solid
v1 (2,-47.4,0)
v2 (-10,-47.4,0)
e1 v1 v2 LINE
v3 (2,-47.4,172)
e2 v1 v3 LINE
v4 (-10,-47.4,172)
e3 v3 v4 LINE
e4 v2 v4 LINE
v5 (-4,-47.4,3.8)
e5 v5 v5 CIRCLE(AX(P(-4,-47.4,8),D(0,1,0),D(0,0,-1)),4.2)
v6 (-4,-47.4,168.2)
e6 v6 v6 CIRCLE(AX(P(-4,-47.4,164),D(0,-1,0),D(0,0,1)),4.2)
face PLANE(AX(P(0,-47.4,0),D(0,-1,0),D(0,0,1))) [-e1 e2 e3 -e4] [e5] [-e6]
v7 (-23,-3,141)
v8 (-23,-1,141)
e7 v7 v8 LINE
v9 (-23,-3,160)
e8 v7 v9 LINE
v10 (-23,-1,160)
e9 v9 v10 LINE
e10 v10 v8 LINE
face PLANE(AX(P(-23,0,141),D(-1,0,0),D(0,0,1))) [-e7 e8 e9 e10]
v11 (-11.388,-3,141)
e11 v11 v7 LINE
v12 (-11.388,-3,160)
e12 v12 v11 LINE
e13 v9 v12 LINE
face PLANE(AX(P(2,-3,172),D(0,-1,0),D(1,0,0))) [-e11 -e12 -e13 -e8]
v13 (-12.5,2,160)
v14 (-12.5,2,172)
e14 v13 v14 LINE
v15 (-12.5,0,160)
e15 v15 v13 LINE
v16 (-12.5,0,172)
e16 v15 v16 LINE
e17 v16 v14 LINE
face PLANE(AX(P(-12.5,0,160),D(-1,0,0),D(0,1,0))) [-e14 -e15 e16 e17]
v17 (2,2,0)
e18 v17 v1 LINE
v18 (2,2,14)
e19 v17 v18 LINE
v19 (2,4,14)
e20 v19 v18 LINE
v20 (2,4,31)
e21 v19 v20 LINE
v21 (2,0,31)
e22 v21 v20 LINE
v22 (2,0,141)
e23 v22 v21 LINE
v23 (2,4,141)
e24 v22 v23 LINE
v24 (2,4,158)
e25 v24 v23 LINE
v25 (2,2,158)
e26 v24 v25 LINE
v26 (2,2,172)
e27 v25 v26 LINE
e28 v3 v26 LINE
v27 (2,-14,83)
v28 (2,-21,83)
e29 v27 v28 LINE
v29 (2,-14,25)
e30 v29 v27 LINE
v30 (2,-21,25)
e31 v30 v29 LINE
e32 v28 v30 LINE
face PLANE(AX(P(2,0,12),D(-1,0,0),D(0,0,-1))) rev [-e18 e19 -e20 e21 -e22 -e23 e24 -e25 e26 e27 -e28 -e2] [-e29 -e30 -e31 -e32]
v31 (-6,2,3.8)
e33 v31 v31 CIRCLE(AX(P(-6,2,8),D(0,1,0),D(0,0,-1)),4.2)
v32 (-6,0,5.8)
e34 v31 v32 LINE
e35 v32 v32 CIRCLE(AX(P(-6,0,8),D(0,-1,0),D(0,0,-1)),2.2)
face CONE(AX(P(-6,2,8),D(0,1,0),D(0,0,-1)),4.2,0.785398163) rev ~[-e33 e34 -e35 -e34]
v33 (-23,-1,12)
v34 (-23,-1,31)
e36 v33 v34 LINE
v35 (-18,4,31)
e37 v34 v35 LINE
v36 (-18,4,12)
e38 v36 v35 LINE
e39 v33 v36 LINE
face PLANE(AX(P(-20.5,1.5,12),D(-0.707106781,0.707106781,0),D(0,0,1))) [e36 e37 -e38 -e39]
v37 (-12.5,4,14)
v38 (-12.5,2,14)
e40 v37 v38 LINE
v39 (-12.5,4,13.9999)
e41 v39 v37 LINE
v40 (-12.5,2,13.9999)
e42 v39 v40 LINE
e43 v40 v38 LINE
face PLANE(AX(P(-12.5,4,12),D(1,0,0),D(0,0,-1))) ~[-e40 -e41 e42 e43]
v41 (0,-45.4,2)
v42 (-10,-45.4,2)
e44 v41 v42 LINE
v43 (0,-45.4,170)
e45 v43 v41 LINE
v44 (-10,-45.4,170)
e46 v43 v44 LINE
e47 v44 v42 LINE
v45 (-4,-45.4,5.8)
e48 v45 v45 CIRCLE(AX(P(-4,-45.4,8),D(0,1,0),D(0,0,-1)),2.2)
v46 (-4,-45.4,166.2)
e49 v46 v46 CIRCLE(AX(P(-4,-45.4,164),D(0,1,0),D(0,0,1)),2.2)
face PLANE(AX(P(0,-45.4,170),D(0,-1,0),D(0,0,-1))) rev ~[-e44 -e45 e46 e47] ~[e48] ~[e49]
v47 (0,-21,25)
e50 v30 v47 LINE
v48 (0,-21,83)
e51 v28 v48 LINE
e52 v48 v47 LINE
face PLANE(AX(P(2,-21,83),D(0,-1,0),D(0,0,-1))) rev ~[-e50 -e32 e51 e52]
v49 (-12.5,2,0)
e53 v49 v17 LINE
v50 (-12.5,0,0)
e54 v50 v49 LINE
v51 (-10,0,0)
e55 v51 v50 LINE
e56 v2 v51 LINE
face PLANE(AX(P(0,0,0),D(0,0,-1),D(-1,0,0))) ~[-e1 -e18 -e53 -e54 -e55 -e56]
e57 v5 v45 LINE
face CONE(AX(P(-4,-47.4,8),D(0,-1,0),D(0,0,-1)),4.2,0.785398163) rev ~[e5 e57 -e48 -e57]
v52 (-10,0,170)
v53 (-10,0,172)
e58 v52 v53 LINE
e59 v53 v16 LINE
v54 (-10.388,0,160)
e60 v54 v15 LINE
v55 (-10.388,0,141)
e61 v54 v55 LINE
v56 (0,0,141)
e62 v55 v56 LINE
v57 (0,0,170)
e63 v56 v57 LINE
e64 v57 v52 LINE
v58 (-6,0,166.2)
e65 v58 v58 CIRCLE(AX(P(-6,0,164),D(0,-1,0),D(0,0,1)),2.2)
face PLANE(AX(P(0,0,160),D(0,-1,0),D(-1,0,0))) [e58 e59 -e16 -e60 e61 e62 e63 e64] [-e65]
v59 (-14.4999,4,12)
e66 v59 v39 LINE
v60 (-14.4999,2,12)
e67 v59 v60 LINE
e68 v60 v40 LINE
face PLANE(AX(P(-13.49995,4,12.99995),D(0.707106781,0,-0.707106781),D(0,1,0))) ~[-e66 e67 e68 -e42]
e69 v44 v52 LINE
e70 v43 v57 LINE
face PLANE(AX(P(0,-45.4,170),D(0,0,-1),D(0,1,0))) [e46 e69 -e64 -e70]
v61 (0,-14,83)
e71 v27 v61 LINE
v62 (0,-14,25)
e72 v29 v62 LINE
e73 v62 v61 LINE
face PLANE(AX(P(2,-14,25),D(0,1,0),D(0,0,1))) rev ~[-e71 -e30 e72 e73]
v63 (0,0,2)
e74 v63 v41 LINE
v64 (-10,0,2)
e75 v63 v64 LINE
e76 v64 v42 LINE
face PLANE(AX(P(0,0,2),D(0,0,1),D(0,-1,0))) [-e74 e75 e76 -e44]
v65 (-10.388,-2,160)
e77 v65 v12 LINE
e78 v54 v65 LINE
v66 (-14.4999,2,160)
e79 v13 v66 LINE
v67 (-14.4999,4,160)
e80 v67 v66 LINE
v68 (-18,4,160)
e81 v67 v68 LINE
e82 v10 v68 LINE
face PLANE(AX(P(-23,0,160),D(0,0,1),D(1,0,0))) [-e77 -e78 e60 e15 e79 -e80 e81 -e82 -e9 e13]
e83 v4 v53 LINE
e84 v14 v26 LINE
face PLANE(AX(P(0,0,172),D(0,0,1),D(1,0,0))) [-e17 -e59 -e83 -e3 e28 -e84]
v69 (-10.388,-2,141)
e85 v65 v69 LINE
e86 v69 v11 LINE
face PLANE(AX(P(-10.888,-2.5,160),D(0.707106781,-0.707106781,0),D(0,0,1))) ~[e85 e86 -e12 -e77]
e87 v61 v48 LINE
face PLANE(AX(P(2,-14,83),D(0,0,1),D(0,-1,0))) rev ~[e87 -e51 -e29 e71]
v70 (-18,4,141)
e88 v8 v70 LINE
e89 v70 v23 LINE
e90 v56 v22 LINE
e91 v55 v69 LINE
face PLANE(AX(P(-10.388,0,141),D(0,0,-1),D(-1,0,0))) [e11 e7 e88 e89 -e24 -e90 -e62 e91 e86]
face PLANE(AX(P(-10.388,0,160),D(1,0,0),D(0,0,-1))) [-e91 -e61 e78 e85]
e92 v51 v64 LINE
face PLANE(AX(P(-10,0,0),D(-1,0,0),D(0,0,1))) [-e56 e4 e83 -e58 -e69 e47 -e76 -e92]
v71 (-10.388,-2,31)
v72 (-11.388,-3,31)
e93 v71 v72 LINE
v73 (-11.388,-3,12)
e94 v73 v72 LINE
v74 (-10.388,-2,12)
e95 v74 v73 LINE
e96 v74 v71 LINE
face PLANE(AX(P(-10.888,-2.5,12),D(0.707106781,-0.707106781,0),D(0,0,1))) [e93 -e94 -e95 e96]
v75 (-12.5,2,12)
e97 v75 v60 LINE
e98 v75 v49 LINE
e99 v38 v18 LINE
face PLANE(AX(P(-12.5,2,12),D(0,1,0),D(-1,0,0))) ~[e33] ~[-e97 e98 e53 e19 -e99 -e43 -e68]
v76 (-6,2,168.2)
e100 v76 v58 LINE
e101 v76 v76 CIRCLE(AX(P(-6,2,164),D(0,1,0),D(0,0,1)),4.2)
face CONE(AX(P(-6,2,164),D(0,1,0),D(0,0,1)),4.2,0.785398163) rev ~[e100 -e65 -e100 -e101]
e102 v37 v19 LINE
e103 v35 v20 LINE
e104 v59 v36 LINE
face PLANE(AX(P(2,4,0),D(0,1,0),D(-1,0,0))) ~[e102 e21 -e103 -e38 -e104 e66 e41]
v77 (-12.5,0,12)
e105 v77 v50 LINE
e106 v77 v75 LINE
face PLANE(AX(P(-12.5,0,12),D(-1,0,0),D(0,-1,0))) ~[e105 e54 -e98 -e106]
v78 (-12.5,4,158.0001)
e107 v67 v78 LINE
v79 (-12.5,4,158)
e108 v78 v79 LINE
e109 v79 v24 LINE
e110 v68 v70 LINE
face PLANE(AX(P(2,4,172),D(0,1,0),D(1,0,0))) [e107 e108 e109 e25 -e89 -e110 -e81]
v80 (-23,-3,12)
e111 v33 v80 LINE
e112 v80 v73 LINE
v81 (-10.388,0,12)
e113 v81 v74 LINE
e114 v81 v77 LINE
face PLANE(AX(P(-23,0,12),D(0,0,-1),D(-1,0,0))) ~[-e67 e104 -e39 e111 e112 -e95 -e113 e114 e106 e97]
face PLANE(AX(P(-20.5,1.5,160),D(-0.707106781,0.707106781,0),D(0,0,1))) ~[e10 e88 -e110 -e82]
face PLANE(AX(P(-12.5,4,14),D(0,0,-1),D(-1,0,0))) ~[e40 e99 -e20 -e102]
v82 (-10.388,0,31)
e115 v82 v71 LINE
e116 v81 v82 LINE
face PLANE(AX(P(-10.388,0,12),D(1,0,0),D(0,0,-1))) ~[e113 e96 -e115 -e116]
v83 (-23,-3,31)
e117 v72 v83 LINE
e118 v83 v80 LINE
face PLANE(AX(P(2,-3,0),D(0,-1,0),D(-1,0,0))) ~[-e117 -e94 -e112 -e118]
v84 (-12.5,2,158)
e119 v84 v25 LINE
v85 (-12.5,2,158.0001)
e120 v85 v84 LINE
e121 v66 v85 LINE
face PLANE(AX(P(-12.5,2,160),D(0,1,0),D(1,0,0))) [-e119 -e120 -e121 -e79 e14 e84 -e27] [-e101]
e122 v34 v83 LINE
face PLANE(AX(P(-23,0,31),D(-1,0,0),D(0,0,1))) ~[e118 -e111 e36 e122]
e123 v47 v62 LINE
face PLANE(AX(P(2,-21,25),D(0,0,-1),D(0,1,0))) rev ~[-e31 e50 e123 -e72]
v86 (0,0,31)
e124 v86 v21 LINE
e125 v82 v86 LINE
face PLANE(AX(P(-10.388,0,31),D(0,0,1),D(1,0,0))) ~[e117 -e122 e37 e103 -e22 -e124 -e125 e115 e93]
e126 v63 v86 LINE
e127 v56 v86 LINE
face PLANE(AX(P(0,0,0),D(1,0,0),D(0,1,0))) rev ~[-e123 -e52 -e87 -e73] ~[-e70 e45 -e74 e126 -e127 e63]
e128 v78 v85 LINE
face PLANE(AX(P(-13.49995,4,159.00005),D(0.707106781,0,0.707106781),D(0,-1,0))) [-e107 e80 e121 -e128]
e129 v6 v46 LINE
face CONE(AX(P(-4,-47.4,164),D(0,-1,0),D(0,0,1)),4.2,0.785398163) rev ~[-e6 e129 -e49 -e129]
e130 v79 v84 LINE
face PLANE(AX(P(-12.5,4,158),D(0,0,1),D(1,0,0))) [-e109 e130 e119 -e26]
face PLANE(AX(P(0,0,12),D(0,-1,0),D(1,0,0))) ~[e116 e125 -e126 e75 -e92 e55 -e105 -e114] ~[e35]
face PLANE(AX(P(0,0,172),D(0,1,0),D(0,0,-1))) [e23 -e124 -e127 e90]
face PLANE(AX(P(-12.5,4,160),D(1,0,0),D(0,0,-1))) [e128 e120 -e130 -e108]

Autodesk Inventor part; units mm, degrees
ref_plane "YZ Plane" through (0, 0, 0) normal (1, 0, 0) x (0, 1, 0)
ref_plane "XZ Plane" through (0, 0, 0) normal (0, 1, 0) x (-1, 0, 0)
ref_plane "XY Plane" through (0, 0, 0) normal (0, 0, 1) x (1, 0, 0)
sketch "Sketch1" plane through (0, 0, 0) normal (1, 0, 0) x (0, 1, 0)
  line L0 (0, 0) -> (-47.4, 0)
  line L1 (-47.4, 0) -> (-47.4, 172)
  line L2 (-47.4, 172) -> (0, 172)
  line L3 (0, 172) -> (0, 0)
  dimension "d0" = 172
  dimension "d1" = 47.4
extrude "Extrusion1" add sketch "Sketch1" along normal blind 2
sketch "Sketch2" plane through (0, 0, 0) normal (-1, 0, 0) x (0, 0, 1)
  line L0 (0, 0) -> (172, 0) projected
  line L1 (172, -47.4) -> (0, -47.4) projected
  line L2 (0, 0) -> (2, 0)
  line L3 (2, 0) -> (2, -47.4)
  line L4 (2, -47.4) -> (0, -47.4)
  line L5 (0, -47.4) -> (0, 0)
  line L6 (172, 0) -> (172, -47.4) projected
  line L7 (0, -47.4) -> (172, -47.4)
  line L8 (172, -47.4) -> (172, -45.4)
  line L9 (172, -45.4) -> (0, -45.4)
  line L10 (0, -45.4) -> (0, -47.4)
  line L11 (172, -47.4) -> (170, -47.4)
  line L12 (170, -47.4) -> (170, 0)
  line L13 (170, 0) -> (172, 0)
  line L14 (172, 0) -> (172, -47.4)
  point P0 (2, -45.4)
  point P1 (0, -47.4)
  point P2 (170, -45.4)
  dimension "d4" = 2
  dimension "d5" = 2
  dimension "d6" = 2
extrude "Extrusion2" add sketch "Sketch2" along normal blind 10 contours L0 L3 L9 L5 | L9 L3 L1 L5 | L0 L6 L9 L12 | L9 L12 L1 L3 | L9 L6 L1 L12
sketch "Sketch3" plane through (2, 0, 172) normal (0, 1, 0) x (1, 0, 0)
  line L0 (0, 0) -> (0, 172) projected
  line L1 (0, 12) -> (-25, 12)
  line L2 (-25, 12) -> (-25, 31)
  line L3 (-25, 31) -> (0, 31)
  line L4 (0, 31) -> (0, 12)
  line L5 (-12, 0) -> (0, 0) projected
  point P0 (-2, 172)
  point P1 (0, 31)
  dimension "d9" = 12
  dimension "d10" = 25
  dimension "d11" = 19
extrude "Extrusion3" add sketch "Sketch3" along normal blind 4
sketch "Sketch4" plane through (2, 0, 172) normal (0, -1, 0) x (1, 0, 0)
  line L0 (-2, -31) -> (-2, -12) projected
  line L1 (0, -12) -> (0, -31) projected
  line L2 (0, -31) -> (-25, -31) projected
  line L3 (-25, -31) -> (-25, -12) projected
  line L4 (-25, -12) -> (0, -12) projected
  line L5 (-25, -31) -> (-25, -12) projected
  line L6 (-2, -31) -> (-25, -31) projected
  line L7 (-25, -12) -> (-12.388, -12)
  line L8 (-12.388, -12) -> (-12.388, -31)
  line L9 (-12.388, -31) -> (-25, -31)
  line L10 (-25, -31) -> (-25, -12)
  point P0 (-2, -172)
  point P1 (-12.388, -12)
  dimension "d14" = 12.388
extrude "Extrusion4" add sketch "Sketch4" along normal blind 3 contours L2 L3 L4 L8
chamfer "Chamfer1" distance 1 angle 45 1 edges at (-10.388, -3, 150.5)
chamfer "Chamfer2" distance 5 angle 45 1 edges at (-23, 4, 150.5)
sketch "Sketch5" plane through (0, 0, 160) normal (0, 0, 1) x (1, 0, 0)
  line L0 (0, 0) -> (-10, 0) projected
  line L1 (2, 0) -> (-12.5, 0)
  line L2 (-12.5, 0) -> (-12.5, 2)
  line L3 (-12.5, 2) -> (2, 2)
  line L4 (2, 2) -> (2, 0)
  point P0 (-5, 0)
  dimension "d26" = 14.5
  dimension "d27" = 2
extrude "Extrusion5" add sketch "Sketch5" along normal up to surface (12 mm away)
ref_plane "Work Plane1" through (-10, -47.4, 86) normal (0, 0, 1) x (1, 0, 0)
sketch "Sketch6" plane through (-12.5, 2, 160) normal (0, 1, 0) x (1, 0, 0)
  line L0 (0, -12) -> (14.5, -12) projected
  line L1 (14.5, 0) -> (14.5, -12) projected
  point P0 (12.5, 160)
  point P1 (6.5, -4)
  dimension "d28" = 8
  dimension "d29" = 8
hole "Hole1" at (-6, 2, 164) direction (0, -1, 0) diameter 4 depth 10 tip angle 118 countersink diameter 8.4 countersink angle 90
sketch "Sketch7" plane through (2, 4, 172) normal (0, 1, 0) x (1, 0, 0)
  line L0 (-20, 12) -> (0, 12) projected
  line L1 (0, 12) -> (-14.5, 12)
  line L2 (-14.5, 12) -> (-14.5, 14)
  line L3 (-14.5, 14) -> (0, 14)
  line L4 (0, 14) -> (0, 12)
  point P0 (-2, 172)
  dimension "d37" = 14.5
  dimension "d38" = 2
extrude "Extrusion6" cut sketch "Sketch7" against normal up to surface (2 mm away)
chamfer "Chamfer3" distance 2 angle 45 1 edges at (-12.5, 3, 160)
mirror "Mirror2" about plane through (-10, -47.4, 86) normal (0, 0, 1) of "Extrusion3", "Extrusion5", "Hole1", "Chamfer3", "Chamfer2", "Chamfer1", "Extrusion4", "Extrusion6"
sketch "Sketch8" plane through (2, -47.4, 0) normal (0, -1, 0) x (1, 0, 0)
  circle A0 centre (-8, 164) radius 2.2 projected
  circle A1 centre (-8, 164) radius 4.2 projected
  circle A2 centre (-8, 8) radius 4.2 projected
  circle A3 centre (-8, 8) radius 2.2 projected
  circle A4 centre (-8, 8) radius 4.2 projected
  line L0 (0, 172) -> (0, 0) projected
  point P0 (-2, 0)
  point P1 (-12, 2)
  point P2 (-6, 8)
  dimension "d51" = 6
hole "Hole2" at (-4, -47.4, 8) direction (0, 1, 0) diameter 4 depth 10 tip angle 118 countersink diameter 8.4 countersink angle 90
mirror "Mirror3" about plane through (-10, -47.4, 86) normal (0, 0, 1) of "Hole2"
sketch "Sketch9" plane through (2, 0, 0) normal (1, 0, 0) x (0, 0, -1)
  line L0 (0, 2) -> (-14, 2) projected
  line L1 (0, -47.4) -> (0, 2) projected
  line L2 (-31, 0) -> (-141, 0) projected
  line L3 (-25, -14) -> (-83, -14)
  line L4 (-83, -14) -> (-83, -21)
  line L5 (-83, -21) -> (-25, -21)
  line L6 (-25, -21) -> (-25, -14)
  point P0 (0, 0)
  point P1 (-83, -14)
  dimension "d52" = 16
  dimension "d53" = 25
  dimension "d54" = 14
  dimension "d55" = 58
  dimension "d56" = 7
extrude "Extrusion7" cut sketch "Sketch9" against normal blind 10
properties part number "backplate"
